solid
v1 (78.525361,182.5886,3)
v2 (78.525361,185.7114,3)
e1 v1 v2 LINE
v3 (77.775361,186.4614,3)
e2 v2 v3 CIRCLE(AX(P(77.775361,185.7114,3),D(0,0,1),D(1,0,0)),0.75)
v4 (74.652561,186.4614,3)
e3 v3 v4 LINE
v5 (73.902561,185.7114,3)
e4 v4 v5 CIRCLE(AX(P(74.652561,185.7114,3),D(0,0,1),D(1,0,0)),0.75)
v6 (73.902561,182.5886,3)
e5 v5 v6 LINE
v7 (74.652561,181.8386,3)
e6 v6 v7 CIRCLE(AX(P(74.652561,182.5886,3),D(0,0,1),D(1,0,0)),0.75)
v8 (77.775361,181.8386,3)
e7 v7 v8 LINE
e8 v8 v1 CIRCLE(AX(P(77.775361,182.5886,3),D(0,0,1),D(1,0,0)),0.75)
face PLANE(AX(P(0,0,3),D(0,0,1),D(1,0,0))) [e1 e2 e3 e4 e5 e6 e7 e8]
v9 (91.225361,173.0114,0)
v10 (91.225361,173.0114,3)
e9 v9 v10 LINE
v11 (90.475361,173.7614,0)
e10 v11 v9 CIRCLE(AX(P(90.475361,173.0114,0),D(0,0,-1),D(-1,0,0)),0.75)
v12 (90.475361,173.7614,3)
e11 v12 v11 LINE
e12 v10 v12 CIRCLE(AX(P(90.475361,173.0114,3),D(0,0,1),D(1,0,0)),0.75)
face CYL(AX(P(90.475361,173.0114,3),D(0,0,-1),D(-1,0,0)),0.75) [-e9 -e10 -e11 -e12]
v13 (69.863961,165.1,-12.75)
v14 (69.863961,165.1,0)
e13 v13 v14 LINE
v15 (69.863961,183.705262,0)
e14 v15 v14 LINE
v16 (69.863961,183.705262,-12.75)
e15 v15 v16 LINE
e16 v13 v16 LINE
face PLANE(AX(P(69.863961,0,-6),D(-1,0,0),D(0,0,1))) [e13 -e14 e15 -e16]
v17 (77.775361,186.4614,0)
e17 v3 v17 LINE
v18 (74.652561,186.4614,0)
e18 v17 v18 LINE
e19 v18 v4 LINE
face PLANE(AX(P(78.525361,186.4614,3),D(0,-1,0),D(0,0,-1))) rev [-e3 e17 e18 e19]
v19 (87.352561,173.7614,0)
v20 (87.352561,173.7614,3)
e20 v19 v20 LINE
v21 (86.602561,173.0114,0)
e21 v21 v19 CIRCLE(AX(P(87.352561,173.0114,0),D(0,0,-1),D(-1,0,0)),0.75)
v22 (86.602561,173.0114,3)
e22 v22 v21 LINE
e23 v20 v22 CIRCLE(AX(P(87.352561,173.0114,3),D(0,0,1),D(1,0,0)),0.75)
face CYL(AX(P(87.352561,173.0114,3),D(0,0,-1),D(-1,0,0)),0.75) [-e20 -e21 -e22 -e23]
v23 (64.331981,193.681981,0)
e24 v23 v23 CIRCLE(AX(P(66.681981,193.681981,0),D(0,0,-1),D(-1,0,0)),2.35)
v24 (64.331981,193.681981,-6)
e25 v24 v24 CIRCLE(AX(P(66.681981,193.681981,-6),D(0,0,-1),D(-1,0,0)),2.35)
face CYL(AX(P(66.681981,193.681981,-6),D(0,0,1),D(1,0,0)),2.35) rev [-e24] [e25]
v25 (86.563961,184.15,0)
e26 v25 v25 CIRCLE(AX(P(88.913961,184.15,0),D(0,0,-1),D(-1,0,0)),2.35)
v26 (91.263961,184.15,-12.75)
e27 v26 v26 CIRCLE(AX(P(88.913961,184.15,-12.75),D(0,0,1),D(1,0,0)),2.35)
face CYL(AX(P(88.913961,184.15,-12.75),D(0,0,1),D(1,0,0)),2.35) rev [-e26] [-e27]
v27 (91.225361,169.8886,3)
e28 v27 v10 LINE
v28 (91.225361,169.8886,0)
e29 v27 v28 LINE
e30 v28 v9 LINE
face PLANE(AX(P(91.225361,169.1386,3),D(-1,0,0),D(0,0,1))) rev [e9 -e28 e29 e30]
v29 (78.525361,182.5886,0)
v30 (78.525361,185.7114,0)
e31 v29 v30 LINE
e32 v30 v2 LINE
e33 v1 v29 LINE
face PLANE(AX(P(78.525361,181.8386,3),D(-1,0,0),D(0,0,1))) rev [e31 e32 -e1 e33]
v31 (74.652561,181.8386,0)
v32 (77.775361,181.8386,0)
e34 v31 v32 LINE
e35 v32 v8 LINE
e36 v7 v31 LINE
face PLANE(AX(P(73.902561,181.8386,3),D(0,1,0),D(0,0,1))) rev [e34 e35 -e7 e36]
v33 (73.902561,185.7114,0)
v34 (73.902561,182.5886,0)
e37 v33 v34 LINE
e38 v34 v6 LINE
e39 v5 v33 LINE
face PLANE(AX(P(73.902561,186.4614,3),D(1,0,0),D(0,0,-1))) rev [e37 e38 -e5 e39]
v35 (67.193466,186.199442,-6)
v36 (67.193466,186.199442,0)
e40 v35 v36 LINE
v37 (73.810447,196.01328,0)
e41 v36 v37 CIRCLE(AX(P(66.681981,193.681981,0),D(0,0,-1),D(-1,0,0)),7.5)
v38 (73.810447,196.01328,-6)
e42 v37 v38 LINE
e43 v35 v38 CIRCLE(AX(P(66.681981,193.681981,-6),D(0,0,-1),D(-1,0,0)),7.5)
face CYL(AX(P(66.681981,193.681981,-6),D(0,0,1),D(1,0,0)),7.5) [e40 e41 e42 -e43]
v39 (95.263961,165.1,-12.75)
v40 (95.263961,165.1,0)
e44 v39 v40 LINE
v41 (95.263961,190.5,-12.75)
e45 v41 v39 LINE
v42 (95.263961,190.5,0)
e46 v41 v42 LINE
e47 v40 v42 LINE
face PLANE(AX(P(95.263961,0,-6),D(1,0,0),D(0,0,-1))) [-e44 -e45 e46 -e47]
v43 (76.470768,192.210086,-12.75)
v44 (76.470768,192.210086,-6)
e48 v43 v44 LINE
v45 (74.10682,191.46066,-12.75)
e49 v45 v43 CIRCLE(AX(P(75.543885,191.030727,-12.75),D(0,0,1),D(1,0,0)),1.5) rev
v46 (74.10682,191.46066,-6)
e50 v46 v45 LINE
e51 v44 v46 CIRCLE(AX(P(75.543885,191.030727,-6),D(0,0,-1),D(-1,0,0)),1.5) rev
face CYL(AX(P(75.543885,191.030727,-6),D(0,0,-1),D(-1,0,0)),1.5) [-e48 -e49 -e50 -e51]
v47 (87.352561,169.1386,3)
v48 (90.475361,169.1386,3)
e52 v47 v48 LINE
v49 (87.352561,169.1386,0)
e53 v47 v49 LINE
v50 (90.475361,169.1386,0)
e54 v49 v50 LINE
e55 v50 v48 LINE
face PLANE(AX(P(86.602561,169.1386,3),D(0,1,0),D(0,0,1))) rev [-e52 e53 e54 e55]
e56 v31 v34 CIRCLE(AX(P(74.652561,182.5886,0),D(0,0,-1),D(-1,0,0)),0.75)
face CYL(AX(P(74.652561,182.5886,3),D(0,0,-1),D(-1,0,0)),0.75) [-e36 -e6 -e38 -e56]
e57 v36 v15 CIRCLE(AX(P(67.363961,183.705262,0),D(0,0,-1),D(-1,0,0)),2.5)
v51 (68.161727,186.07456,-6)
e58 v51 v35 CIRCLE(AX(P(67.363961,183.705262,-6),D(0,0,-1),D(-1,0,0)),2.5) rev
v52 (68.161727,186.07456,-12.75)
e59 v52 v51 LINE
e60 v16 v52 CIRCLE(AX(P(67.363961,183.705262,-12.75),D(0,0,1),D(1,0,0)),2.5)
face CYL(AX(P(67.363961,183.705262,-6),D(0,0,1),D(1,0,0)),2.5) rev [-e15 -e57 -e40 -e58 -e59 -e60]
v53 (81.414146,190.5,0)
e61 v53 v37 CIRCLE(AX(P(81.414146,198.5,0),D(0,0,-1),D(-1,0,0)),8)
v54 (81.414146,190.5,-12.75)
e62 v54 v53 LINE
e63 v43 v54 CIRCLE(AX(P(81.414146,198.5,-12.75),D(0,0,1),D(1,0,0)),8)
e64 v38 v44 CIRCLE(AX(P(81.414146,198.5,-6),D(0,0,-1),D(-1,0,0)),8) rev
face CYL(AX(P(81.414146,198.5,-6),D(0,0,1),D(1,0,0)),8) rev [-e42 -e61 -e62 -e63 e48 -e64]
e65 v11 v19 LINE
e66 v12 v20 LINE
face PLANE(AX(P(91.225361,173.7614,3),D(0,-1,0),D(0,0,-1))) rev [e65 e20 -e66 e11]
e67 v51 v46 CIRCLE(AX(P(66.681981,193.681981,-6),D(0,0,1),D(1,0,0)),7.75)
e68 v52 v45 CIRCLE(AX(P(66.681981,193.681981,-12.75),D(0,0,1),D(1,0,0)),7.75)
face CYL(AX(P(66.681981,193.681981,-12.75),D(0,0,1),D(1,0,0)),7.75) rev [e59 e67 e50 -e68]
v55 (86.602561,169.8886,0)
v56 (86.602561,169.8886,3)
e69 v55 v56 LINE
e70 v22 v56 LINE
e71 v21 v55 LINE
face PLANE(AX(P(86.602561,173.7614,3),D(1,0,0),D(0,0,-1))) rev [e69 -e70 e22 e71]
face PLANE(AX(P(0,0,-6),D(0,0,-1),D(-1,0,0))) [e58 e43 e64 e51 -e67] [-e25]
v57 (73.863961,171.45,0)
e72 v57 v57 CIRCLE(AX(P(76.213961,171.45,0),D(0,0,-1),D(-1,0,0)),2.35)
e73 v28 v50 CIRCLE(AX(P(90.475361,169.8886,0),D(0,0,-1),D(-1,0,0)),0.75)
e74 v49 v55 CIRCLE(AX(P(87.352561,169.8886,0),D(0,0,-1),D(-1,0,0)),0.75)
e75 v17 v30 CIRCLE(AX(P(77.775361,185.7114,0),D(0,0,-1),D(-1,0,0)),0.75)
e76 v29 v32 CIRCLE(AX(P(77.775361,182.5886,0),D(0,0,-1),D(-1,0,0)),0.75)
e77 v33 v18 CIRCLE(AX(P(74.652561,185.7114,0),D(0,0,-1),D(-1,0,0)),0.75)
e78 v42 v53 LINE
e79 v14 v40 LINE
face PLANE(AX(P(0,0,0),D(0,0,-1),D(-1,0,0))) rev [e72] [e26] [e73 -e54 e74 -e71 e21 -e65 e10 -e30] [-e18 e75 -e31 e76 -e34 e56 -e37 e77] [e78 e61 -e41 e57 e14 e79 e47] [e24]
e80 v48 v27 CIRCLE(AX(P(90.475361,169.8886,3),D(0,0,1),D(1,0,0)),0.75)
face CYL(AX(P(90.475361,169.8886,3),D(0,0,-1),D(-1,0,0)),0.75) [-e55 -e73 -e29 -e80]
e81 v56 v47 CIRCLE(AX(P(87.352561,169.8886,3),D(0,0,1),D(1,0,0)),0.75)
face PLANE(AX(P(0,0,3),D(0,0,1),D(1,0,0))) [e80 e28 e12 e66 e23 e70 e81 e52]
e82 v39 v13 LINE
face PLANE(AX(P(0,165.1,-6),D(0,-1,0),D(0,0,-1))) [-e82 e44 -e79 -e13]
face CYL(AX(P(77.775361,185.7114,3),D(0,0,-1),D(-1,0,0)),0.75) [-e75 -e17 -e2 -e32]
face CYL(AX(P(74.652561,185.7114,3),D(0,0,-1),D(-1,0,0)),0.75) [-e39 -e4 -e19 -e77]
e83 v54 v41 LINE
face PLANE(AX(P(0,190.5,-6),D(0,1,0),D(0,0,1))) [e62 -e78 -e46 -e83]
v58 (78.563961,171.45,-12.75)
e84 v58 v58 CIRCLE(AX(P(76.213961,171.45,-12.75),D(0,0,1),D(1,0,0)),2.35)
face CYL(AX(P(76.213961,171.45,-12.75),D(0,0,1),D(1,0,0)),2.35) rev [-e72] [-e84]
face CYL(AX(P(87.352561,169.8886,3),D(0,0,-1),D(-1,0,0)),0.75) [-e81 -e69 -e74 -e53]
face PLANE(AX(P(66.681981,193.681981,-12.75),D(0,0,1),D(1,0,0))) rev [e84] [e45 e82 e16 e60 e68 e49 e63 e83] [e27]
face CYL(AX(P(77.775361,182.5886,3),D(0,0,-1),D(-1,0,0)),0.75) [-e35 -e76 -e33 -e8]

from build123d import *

# Parameters (mm, degrees)
SKETCH3_R             = 2.35
BOSS_EXTRUDE1_DEPTH   = 3
BOSS_EXTRUDE1_2_DEPTH = 3
SKETCH3_W             = 4.6228
SKETCH3_H             = 4.6228
BOSS_EXTRUDE1_3_DEPTH = 3
BOSS_EXTRUDE1_4_DEPTH = 3
SKETCH4_R             = 7.5
SKETCH4_R_2           = 2.35
SKETCH4_W             = 25.4
SKETCH4_H             = 25.4
BOSS_EXTRUDE2_DEPTH   = 6
BOSS_EXTRUDE3_DEPTH   = 6.75
SKETCH7_R             = 2.35
CUT_EXTRUDE2_DEPTH    = 224.153476458
FILLET1_R             = 8
FILLET2_R             = 2.5
FILLET3_R             = 1.5
FILLET4_R             = 0.75


with BuildPart() as part:
    # Sketch3 → Boss-Extrude1 (new body)
    with BuildSketch(Plane.XY):
        with Locations((88.913961031, 184.15)):
            Circle(SKETCH3_R)
    extrude(amount=BOSS_EXTRUDE1_DEPTH)


with BuildPart() as body_2:
    # Sketch3 → Boss-Extrude1 2 (new body)
    with BuildSketch(Plane.XY):
        with Locations((76.213961031, 171.45)):
            Circle(SKETCH3_R)
    extrude(amount=BOSS_EXTRUDE1_2_DEPTH)


with BuildPart() as body_3:
    # Sketch3 → Boss-Extrude1 3 (new body)
    with BuildSketch(Plane.XY):
        with Locations((76.213961031, 184.15)):
            Rectangle(SKETCH3_W, SKETCH3_H)
    extrude(amount=BOSS_EXTRUDE1_3_DEPTH)



with BuildPart() as body_4:
    # Sketch3 → Boss-Extrude1 4 (new body)
    with BuildSketch(Plane.XY):
        with Locations((88.913961031, 171.45)):
            Rectangle(SKETCH3_W, SKETCH3_H)
    extrude(amount=BOSS_EXTRUDE1_4_DEPTH)


with BuildPart() as body_3_1:
    add(body_3.part)

    add(body_4.part)  # Boss-Extrude2 merges body 4

    add(body_2.part)  # Boss-Extrude2 merges body 2
    # Sketch4 → Boss-Extrude2 (add)
    # profile 1 of 2: a face of its own
    with BuildSketch(Plane(origin=(0, 0, 0), x_dir=(-1, 0, 0), z_dir=(0, 0, -1))):
        with Locations((-66.681980515, 193.681980515)):
            Circle(SKETCH4_R)
        with Locations((-66.681980515, 193.681980515)):
            Circle(SKETCH4_R_2, mode=Mode.SUBTRACT)
    # profile 2 of 2: a face of its own
    with BuildSketch(Plane(origin=(0, 0, 0), x_dir=(-1, 0, 0), z_dir=(0, 0, -1))):
        with Locations((-82.563961031, 177.8)):
            Rectangle(SKETCH4_W, SKETCH4_H)
    extrude(amount=BOSS_EXTRUDE2_DEPTH)

    # Sketch6 → Boss-Extrude3 (add)
    with BuildSketch(Plane(origin=(0, 0, -6), x_dir=(-1, 0, 0), z_dir=(0, 0, -1))):
        with BuildLine():
            Line((-73.748627528, 190.5), (-95.263961031, 190.5))
            Line((-95.263961031, 190.5), (-95.263961031, 165.1))
            Line((-95.263961031, 165.1), (-69.863961031, 165.1))
            Line((-69.863961031, 165.1), (-69.863961031, 186.615333503))
            ThreePointArc((-69.863961031, 186.615333503), (-72.16205807, 188.201902961), (-73.748627528, 190.5))
        make_face()
    extrude(amount=BOSS_EXTRUDE3_DEPTH)


with BuildPart() as cut_extrude2_tool:
    # Sketch7 → Cut-Extrude2 (new, through all)
    with BuildSketch(Plane.XY.offset(3)):
        with Locations((88.913961031, 184.15)):
            Circle(SKETCH7_R)
        with Locations((76.213961031, 171.45)):
            Circle(SKETCH7_R)
    extrude(amount=-CUT_EXTRUDE2_DEPTH)


with BuildPart() as part_1:
    add(part.part)

    # Cut-Extrude2: cut by cut_extrude2_tool
    add(cut_extrude2_tool.part, mode=Mode.SUBTRACT)


with BuildPart() as body_3_2:
    add(body_3_1.part)

    # Cut-Extrude2: cut by cut_extrude2_tool
    add(cut_extrude2_tool.part, mode=Mode.SUBTRACT)

    # Fillet1
    fillet1_edges = [body_3_2.edges().sort_by_distance(p)[0] for p in [
        (73.473519369, 190.5, -3),
    ]]
    fillet(fillet1_edges, radius=FILLET1_R)

    # Fillet2
    # the kernel refuses this fillet: 2.5 mm, written as the material it adds along each edge
    with BuildSketch(Plane(origin=(69.863961031, 186.890441662, -13.962947932), x_dir=(-0.9681157623464371, -0.25050323490202075, 0), z_dir=(0, 0, 1))) as fillet2_piece_1_section:
        with BuildLine():
            CenterArc((3.218187092, 2.457364076), FILLET2_R, 165.492706976, 93.910495797)
            Line((0.797897687, 3.083622163), (0, 0))
            ThreePointArc((0, 0), (1.37922304, 0.127907773), (2.758446079, 0))
        make_face()
    fillet2_piece_1 = extrude(amount=13.962947932, mode=Mode.PRIVATE)
    fillet2_piece_1 = split(fillet2_piece_1, bisect_by=Plane(origin=(69.434424627, 185.67157625, -6), z_dir=(0, 0, -1)), keep=Keep.TOP, mode=Mode.PRIVATE)
    fillet2_piece_1 = fillet2_piece_1 - Plane(origin=(66.681980515, 193.681980515, -9.375), x_dir=(0.4105781310115351, -0.9118254209743633, 0), z_dir=(0, 0, 1)) * Cylinder(7.75, 41, mode=Mode.PRIVATE)
    fillet2_piece_1 = split(fillet2_piece_1, bisect_by=Plane(origin=(69.434424627, 185.67157625, -12.75), z_dir=(0, 0, 1)), keep=Keep.TOP, mode=Mode.PRIVATE)
    add(fillet2_piece_1)
    with BuildSketch(Plane(origin=(69.863961031, 186.890441662, -6), x_dir=(-0.9681157623464371, -0.25050323490202075, 0), z_dir=(0, 0, 1))) as fillet2_piece_2_section:
        with BuildLine():
            CenterArc((3.218187092, 2.457364076), FILLET2_R, 165.492706976, 93.910495797)
            Line((0.797897687, 3.083622163), (0, 0))
            ThreePointArc((0, 0), (1.37922304, 0.127907773), (2.758446079, 0))
        make_face()
    fillet2_piece_2 = extrude(amount=6, mode=Mode.PRIVATE)
    fillet2_piece_2 = fillet2_piece_2 & Plane(origin=(66.681980515, 193.681980515, -3), x_dir=(0.4105781310115351, -0.9118254209743633, 0), z_dir=(0, 0, 1)) * Cylinder(7.75, 25, mode=Mode.PRIVATE)
    add(fillet2_piece_2)
    with BuildSketch(Plane(origin=(69.863961031, 186.890441662, -6), x_dir=(-0.9681157623464371, -0.25050323490202075, 0), z_dir=(0, 0, 1))) as fillet2_piece_3_section:
        with BuildLine():
            CenterArc((3.218187092, 2.457364076), FILLET2_R, 165.492706976, 93.910495797)
            Line((0.797897687, 3.083622163), (0, 0))
            ThreePointArc((0, 0), (1.37922304, 0.127907773), (2.758446079, 0))
        make_face()
    fillet2_piece_3 = extrude(amount=6, mode=Mode.PRIVATE)
    fillet2_piece_3 = fillet2_piece_3 - Plane(origin=(66.681980515, 193.681980515, -3), x_dir=(0.4105781310115351, -0.9118254209743633, 0), z_dir=(0, 0, 1)) * Cylinder(7.75, 25, mode=Mode.PRIVATE)
    add(fillet2_piece_3)

    # Fillet3
    fillet3_edges = [body_3_2.edges().sort_by_distance(p)[0] for p in [
        (74.361694574, 194.723369962, -9.375),
    ]]
    fillet(fillet3_edges, radius=FILLET3_R)

    # Fillet4
    fillet4_edges = [body_3_2.edges().sort_by_distance(p)[0] for p in [
        (91.225361031, 173.7614, 1.5),
        (86.602561031, 173.7614, 1.5),
        (86.602561031, 169.1386, 1.5),
        (91.225361031, 169.1386, 1.5),
        (78.525361031, 181.8386, 1.5),
        (73.902561031, 181.8386, 1.5),
        (73.902561031, 186.4614, 1.5),
        (78.525361031, 186.4614, 1.5),
    ]]
    fillet(fillet4_edges, radius=FILLET4_R)


solid = body_3_2.part
